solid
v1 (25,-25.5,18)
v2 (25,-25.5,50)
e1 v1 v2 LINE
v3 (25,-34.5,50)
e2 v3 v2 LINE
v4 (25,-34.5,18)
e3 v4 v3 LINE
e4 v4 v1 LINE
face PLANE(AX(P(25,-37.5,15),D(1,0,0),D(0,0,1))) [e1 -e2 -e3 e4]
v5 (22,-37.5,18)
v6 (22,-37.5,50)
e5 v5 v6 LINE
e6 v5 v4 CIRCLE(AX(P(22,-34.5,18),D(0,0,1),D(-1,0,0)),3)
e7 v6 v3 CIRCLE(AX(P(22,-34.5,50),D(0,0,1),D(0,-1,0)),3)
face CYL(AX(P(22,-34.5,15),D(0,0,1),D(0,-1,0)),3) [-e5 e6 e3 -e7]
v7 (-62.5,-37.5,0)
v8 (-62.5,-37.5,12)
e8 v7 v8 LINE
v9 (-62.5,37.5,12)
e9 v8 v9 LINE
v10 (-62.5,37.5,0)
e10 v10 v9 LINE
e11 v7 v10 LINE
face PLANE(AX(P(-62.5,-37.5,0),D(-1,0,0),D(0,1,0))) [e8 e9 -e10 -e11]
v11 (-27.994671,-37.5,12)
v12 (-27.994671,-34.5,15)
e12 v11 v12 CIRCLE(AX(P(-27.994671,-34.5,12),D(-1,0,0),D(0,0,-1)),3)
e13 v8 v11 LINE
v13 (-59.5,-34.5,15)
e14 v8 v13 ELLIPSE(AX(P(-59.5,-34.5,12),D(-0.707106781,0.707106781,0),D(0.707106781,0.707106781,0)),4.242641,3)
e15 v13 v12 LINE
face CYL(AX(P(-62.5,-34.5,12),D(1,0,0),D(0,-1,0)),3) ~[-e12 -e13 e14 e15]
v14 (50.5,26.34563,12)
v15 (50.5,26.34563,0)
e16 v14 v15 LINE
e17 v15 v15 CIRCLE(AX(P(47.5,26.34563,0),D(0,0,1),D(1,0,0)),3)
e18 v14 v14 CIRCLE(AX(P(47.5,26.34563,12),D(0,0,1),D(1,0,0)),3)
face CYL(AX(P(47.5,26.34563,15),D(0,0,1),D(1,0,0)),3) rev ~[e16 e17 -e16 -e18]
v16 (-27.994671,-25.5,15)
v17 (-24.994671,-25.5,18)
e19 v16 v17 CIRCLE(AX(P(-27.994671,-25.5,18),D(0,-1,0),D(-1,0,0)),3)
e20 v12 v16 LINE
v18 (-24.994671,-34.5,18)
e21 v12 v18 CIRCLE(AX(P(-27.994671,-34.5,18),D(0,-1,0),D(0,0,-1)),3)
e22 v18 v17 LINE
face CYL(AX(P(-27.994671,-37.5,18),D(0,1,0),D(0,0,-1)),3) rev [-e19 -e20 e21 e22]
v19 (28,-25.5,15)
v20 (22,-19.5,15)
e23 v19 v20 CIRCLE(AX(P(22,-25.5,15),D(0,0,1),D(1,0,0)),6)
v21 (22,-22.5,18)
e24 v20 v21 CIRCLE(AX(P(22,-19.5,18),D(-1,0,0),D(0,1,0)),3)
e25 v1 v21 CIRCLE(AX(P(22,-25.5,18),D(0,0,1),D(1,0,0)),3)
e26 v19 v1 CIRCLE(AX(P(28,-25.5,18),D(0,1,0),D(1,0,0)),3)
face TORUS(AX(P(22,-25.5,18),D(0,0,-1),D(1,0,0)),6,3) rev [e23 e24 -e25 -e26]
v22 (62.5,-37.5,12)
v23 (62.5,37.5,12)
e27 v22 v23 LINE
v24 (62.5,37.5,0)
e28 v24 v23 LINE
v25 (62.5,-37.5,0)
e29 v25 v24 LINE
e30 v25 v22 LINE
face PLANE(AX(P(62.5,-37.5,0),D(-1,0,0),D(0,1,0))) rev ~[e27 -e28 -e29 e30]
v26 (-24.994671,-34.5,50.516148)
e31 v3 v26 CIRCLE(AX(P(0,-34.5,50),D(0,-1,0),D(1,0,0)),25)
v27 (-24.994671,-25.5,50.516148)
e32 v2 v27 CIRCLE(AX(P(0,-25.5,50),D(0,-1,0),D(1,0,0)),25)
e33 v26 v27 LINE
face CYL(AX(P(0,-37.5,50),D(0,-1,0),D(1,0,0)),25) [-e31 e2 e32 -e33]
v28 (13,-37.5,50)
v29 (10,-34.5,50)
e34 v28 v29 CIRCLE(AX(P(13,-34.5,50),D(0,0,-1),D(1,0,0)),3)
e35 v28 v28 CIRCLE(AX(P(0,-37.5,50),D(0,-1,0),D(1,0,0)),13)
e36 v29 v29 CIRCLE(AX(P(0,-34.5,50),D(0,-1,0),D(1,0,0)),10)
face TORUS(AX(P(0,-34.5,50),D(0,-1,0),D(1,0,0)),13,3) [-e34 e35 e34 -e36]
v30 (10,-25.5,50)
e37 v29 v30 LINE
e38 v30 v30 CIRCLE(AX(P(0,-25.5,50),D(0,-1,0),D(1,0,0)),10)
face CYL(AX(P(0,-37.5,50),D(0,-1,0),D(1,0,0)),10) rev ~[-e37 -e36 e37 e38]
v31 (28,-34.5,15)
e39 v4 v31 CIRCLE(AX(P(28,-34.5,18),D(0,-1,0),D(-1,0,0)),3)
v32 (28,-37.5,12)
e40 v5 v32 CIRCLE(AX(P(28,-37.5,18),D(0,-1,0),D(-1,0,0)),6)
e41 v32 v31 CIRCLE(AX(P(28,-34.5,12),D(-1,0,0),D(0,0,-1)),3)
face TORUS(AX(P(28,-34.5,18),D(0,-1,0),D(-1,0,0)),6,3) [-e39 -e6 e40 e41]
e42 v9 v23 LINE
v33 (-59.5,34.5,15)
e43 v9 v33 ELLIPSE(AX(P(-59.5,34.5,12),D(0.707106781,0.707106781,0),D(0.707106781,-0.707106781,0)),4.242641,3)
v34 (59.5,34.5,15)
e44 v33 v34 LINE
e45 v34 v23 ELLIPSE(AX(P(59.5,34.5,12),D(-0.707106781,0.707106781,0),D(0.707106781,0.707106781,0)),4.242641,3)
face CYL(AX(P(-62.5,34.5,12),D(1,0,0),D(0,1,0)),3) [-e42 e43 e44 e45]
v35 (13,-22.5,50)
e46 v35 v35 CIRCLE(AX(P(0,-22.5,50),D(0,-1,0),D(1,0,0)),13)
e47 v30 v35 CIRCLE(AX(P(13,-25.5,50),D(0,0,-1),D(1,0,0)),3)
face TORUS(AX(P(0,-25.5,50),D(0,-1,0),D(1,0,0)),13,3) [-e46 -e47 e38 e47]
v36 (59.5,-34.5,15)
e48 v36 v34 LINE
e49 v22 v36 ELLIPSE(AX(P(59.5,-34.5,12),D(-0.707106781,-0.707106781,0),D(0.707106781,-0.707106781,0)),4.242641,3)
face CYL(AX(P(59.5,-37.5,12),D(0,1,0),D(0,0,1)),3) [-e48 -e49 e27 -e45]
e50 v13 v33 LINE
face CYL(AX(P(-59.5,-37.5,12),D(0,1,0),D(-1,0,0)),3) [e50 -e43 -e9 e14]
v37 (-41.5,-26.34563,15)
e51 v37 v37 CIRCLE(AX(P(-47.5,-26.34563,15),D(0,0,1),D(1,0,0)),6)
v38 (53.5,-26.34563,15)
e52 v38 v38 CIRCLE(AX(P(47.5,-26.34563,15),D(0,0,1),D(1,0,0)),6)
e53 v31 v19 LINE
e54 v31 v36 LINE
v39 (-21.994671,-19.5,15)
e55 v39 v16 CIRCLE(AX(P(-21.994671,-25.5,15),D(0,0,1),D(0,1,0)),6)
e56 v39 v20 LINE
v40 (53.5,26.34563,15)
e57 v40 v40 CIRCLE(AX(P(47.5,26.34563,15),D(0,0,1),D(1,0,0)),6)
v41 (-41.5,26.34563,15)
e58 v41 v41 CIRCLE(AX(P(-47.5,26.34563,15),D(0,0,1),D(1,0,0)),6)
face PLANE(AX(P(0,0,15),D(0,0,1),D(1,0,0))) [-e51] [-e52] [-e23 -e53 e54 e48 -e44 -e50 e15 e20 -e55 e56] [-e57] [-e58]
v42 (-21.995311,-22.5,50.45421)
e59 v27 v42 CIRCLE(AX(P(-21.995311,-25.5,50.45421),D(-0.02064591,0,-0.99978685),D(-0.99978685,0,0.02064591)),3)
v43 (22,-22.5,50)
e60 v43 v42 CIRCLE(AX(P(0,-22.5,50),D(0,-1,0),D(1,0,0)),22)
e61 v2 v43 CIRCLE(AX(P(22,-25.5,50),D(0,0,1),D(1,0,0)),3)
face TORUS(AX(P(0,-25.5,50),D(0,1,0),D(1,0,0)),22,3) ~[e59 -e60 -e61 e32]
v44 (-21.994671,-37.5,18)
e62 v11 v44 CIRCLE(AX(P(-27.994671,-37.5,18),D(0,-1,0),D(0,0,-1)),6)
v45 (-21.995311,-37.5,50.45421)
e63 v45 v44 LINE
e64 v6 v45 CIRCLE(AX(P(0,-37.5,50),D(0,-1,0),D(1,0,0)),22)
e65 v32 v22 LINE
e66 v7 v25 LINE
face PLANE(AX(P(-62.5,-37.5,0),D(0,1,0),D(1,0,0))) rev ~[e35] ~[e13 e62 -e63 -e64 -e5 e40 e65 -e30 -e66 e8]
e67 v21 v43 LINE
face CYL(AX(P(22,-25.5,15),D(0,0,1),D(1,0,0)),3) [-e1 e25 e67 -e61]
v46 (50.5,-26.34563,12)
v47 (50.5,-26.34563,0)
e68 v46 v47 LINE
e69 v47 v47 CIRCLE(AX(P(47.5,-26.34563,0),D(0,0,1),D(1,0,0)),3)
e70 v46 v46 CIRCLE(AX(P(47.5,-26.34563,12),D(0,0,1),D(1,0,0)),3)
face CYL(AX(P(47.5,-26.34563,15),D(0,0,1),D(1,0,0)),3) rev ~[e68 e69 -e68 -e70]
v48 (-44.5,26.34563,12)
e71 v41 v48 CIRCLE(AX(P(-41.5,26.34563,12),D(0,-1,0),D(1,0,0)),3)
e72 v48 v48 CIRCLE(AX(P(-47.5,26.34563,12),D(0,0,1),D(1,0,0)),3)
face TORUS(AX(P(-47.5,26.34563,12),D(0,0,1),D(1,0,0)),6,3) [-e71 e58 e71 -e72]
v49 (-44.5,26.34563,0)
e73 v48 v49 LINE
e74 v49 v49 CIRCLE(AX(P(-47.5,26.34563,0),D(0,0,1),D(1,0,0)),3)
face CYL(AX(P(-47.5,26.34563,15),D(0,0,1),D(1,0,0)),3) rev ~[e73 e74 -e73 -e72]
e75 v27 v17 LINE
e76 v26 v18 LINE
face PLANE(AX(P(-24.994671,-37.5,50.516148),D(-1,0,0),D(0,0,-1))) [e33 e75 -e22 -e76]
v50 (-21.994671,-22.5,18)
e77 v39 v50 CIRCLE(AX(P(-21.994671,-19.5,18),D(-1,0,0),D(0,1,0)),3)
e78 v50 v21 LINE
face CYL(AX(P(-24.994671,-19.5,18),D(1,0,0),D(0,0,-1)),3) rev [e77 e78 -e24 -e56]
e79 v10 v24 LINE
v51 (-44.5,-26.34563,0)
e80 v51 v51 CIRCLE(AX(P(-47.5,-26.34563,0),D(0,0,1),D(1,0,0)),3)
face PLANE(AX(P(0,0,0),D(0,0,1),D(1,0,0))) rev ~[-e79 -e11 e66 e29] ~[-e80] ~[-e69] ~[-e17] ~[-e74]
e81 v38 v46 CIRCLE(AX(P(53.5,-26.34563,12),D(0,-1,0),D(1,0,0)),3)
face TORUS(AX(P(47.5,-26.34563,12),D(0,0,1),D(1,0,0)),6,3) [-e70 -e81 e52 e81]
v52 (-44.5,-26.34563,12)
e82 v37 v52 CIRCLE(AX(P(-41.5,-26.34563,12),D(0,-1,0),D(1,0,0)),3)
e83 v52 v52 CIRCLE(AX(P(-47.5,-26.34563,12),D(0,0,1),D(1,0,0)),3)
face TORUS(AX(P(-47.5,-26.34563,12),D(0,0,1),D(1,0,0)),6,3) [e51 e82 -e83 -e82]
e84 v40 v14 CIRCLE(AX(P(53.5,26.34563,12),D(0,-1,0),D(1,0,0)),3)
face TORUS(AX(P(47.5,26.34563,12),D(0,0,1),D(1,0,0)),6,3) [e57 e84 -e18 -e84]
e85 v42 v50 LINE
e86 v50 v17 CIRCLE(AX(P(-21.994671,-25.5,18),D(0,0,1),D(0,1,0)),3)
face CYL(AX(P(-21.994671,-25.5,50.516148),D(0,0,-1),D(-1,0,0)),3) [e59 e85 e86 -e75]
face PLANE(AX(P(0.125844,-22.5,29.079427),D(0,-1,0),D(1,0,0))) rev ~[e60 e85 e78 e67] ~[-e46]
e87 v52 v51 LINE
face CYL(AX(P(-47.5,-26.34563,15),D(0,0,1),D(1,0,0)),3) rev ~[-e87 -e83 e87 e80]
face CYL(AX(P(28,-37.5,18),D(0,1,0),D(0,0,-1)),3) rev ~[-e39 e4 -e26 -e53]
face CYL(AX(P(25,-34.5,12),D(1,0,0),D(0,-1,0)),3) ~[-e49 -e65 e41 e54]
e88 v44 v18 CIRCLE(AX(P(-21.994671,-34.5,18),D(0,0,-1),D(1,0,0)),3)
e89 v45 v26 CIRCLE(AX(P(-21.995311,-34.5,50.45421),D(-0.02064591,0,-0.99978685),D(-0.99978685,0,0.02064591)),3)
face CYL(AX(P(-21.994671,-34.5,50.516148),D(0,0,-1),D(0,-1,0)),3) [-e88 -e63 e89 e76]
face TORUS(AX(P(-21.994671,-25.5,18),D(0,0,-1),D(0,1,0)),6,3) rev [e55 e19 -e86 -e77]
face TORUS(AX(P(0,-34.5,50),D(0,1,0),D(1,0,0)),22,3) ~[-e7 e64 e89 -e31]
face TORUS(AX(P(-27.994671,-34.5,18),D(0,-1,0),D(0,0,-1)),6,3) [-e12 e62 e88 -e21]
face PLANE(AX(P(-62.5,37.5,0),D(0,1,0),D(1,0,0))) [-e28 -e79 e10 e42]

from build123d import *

# Parameters (mm, degrees)
F0_W     = 125
F0_H     = 75
F1_DEPTH = 15
F3_R     = 10
F4_DEPTH = 15
F5_R     = 3
F6_DEPTH = 25
F7_R     = 3


with BuildPart() as f1:
    # F0 (on Top) → F1 (new body)
    with BuildSketch(Plane.XY):
        Rectangle(F0_W, F0_H)
    extrude(amount=F1_DEPTH)

    # F3 (on face) → F4 (join)
    with BuildSketch(Plane.XZ.offset(37.5)):
        with BuildLine():
            Line((25, 15), (25, 50))
            ThreePointArc((25, 50), (0.2580876326, 25.00133222), (-24.9946712619, 49.4838522411))
            Line((-24.9946712619, 49.4838522411), (-24.9946712619, 15))
            Line((-24.9946712619, 15), (25, 15))
        make_face()
        with BuildLine():
            ThreePointArc((-24.9946712619, 49.4838522411), (0.2580876326, 25.00133222), (25, 50))
            ThreePointArc((25, 50), (0.2580876326, 74.99866778), (-24.9946712619, 50.5161477589))
            Line((-24.9946712619, 50.5161477589), (-24.9946712619, 49.4838522411))
        make_face()
        with Locations((0, 50)):
            Circle(F3_R, mode=Mode.SUBTRACT)
    extrude(amount=-F4_DEPTH)

    # F5 (on face) → F6 (cut)
    with BuildSketch(Plane.XY.offset(15)):
        with Locations((-47.5, 26.3456302691)):
            Circle(F5_R)
        with Locations((47.5, 26.3456302691)):
            Circle(F5_R)
        with Locations((47.5, -26.3456302691)):
            Circle(F5_R)
        with Locations((-47.5, -26.3456302691)):
            Circle(F5_R)
    extrude(amount=-F6_DEPTH, mode=Mode.SUBTRACT)

    # F7
    f7_edges = [f1.edges().sort_by_distance(p)[0] for p in [
        (43.75, -37.5, 15),
        (25, -30, 15),
        (62.5, 0, 15),
        (0.002664, -22.5, 15),
        (0, 37.5, 15),
        (-24.994671, -30, 15),
        (-62.5, 0, 15),
        (-43.747336, -37.5, 15),
        (-50.5, -26.34563, 15),
        (44.5, -26.34563, 15),
        (-50.5, 26.34563, 15),
        (44.5, 26.34563, 15),
        (25, -22.5, 32.5),
        (0.258088, -22.5, 74.998668),
        (-24.994671, -22.5, 32.758074),
        (-10, -22.5, 50),
        (-10, -37.5, 50),
        (-24.994671, -37.5, 32.758074),
        (0.258088, -37.5, 74.998668),
        (25, -37.5, 32.5),
    ]]
    fillet(f7_edges, radius=F7_R)


solid = f1.part
